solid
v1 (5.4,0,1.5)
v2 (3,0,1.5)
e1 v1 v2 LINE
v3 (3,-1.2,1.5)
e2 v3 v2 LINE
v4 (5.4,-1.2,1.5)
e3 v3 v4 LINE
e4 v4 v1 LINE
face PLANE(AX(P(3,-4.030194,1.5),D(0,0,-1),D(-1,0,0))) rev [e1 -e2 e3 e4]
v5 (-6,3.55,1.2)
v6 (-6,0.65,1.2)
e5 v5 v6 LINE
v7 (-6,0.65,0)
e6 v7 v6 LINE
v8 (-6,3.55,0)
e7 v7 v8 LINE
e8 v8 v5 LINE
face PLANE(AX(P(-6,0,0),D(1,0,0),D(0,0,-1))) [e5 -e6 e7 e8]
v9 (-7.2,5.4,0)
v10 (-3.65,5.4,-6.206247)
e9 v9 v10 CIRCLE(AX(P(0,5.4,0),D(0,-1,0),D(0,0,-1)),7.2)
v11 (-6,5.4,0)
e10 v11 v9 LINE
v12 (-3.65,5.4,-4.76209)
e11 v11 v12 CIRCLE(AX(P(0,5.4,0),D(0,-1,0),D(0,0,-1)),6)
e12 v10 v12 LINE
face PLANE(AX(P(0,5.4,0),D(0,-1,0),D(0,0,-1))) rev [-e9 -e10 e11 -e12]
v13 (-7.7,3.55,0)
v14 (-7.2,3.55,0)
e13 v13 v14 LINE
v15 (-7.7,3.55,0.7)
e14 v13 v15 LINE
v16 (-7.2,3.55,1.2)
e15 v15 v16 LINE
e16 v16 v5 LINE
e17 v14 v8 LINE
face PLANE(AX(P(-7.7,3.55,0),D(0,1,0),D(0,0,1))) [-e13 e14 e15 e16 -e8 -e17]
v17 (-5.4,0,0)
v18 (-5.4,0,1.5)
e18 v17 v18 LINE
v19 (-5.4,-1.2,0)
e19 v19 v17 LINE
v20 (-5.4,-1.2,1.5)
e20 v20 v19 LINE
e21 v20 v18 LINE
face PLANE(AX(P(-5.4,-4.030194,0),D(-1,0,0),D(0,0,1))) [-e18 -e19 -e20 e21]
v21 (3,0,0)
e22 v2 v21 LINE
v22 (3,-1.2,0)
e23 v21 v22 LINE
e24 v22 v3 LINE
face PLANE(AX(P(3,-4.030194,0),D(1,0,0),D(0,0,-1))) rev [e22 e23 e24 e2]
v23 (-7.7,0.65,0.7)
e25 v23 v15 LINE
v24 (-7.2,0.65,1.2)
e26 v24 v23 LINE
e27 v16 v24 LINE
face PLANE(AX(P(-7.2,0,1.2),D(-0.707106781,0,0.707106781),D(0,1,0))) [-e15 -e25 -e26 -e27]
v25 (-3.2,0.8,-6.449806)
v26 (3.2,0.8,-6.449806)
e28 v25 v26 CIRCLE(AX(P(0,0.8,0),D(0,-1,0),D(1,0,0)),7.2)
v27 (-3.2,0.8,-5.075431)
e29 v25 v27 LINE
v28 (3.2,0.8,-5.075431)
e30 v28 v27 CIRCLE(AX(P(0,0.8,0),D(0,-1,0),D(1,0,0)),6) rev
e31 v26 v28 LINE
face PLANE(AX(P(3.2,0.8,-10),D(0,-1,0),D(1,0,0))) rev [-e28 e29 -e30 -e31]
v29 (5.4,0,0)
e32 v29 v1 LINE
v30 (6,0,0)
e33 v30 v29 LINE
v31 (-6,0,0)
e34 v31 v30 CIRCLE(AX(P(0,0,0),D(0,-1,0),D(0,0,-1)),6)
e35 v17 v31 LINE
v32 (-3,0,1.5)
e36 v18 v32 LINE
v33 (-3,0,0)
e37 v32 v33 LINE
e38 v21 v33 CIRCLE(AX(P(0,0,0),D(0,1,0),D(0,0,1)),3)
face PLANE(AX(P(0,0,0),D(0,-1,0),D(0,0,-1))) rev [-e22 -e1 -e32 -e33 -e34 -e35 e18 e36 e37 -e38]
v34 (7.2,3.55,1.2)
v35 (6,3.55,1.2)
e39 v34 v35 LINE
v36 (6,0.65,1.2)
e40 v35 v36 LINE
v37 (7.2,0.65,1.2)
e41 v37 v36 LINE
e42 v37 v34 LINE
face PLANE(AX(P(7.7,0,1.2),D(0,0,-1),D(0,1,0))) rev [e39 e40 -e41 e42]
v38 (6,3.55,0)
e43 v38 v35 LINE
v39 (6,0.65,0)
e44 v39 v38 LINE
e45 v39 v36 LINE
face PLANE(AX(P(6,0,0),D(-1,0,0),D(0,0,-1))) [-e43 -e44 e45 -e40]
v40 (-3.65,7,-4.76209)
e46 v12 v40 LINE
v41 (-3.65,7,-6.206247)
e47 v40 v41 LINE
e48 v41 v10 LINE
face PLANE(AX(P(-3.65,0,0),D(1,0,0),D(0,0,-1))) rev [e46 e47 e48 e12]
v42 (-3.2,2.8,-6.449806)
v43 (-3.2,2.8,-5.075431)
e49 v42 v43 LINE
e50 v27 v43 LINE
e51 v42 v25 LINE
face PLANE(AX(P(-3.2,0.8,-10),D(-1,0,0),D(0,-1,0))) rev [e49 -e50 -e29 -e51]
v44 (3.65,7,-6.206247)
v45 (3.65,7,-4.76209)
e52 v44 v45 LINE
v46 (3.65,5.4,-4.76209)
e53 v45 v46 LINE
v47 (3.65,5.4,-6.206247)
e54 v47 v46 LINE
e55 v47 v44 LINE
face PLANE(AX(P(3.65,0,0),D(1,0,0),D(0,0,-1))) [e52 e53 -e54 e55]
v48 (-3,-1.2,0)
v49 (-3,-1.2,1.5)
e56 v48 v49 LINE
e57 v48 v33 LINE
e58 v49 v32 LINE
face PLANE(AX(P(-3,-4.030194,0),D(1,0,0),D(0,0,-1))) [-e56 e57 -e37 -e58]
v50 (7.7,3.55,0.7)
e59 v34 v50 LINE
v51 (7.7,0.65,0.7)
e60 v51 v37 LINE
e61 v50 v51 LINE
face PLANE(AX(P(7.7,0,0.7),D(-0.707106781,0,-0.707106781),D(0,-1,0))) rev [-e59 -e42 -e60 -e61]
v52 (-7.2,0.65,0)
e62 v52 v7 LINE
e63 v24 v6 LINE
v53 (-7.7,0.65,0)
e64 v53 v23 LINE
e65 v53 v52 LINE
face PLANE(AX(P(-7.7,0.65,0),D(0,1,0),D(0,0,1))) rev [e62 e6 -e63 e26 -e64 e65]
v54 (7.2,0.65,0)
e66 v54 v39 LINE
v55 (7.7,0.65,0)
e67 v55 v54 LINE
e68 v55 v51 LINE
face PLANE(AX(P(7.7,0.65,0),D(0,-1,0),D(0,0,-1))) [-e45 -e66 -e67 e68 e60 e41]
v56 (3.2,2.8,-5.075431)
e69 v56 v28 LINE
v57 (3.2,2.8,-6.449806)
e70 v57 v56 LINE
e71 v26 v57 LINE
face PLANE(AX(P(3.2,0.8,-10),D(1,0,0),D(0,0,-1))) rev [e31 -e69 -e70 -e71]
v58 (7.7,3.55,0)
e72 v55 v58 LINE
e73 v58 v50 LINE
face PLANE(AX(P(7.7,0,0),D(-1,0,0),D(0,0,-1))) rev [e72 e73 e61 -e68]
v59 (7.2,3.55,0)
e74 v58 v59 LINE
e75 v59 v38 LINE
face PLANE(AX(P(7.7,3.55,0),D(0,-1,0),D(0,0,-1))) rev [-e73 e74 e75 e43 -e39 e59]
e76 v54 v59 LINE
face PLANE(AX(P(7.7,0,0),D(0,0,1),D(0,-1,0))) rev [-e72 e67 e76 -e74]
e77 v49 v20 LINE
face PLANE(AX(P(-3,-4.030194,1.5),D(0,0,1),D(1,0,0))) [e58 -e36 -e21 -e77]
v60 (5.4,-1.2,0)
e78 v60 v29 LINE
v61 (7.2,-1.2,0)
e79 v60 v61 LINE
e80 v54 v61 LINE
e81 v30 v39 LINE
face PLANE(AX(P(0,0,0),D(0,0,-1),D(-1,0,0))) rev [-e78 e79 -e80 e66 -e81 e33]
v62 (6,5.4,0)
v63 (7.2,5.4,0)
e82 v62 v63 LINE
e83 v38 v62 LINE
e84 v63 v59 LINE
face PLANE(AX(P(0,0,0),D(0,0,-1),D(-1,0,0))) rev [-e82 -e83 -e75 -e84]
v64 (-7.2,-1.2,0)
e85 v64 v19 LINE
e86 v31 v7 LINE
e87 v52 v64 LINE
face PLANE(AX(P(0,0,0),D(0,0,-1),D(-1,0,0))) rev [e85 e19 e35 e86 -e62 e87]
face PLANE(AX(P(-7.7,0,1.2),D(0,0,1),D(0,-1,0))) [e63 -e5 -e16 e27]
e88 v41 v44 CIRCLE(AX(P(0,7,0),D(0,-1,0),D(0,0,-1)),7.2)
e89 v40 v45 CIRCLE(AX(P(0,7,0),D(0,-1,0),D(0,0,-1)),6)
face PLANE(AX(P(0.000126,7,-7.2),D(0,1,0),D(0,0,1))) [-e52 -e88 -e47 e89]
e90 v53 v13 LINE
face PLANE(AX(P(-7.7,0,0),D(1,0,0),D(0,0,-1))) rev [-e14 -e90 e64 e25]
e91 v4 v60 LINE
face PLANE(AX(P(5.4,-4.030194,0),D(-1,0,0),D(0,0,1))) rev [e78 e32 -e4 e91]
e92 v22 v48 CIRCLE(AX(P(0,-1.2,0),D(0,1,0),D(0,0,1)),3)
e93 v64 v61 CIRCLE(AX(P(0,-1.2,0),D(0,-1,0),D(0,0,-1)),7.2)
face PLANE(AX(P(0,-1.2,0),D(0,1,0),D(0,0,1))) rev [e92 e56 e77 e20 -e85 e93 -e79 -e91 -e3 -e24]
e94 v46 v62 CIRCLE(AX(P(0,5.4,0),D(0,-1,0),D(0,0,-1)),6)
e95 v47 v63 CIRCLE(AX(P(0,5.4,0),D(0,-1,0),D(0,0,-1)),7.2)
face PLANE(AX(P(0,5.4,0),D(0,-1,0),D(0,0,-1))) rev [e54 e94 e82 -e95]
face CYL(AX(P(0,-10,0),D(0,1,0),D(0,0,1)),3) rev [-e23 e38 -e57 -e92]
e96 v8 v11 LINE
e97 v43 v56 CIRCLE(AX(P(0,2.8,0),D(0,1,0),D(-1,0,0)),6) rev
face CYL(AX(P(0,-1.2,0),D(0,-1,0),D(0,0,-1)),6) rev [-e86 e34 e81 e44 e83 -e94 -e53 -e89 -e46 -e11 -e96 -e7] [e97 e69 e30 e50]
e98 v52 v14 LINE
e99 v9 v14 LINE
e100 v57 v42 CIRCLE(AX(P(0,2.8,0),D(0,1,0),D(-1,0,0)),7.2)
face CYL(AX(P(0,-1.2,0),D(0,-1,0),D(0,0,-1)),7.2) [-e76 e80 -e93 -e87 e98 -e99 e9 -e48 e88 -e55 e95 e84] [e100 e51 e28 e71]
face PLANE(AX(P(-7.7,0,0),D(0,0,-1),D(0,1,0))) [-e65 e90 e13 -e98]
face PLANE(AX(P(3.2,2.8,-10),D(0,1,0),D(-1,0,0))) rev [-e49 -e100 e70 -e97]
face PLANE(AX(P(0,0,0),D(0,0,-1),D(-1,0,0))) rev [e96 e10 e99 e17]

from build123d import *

# Parameters (mm, degrees)
SKETCH1_W                = 6
SKETCH1_H                = 1.2
SKETCH1_W_2              = 1.2
SKETCH1_H_2              = 5.4
REVOLVE1_ANGLE           = 180
REVOLVE2_START           = 5.4
REVOLVE2_DEPTH           = 1.6
SKETCH4_W                = 6.4
SKETCH4_H                = 2
CUT_EXTRUDE1_DEPTH       = 10
SKETCH5_R                = 3
CUT_EXTRUDE2_DEPTH       = 10
SKETCH6_W                = 2.4
SKETCH6_H                = 1.5
BOSS_EXTRUDE1_DEPTH      = 1.2
SKETCH7_W                = 1.2
SKETCH7_H                = 2.9
BOSS_EXTRUDE2_DEPTH      = 1.7
CHAMFER1_SIZE            = 0.5
CHAMFER1_OF_MIRROR1_SIZE = 0.5


# Read off the part's stored shape, not the designer's step: Revolve2
with BuildPart() as part:
    # Sketch1 → Revolve1 (revolve)
    with BuildSketch(Plane.XY):
        with Locations((3, -0.6)):
            Rectangle(SKETCH1_W, SKETCH1_H)
        with Locations((6.6, -0.6)):
            Rectangle(SKETCH1_W_2, SKETCH1_H)
        with Locations((6.6, 2.7)):
            Rectangle(SKETCH1_W_2, SKETCH1_H_2)
    revolve(axis=Axis((0, -1.2, 0), (0, 1, 0)), revolution_arc=REVOLVE1_ANGLE)

    # Revolve2 outline → Revolve2 (add)
    with BuildSketch(Plane(origin=(0, 0, 0), x_dir=(1, 0, 0), z_dir=(0, 1, 0)).offset(REVOLVE2_START)):
        with BuildLine():
            ThreePointArc((3.65, 6.206246853), (0, 7.2), (-3.65, 6.206246853))
            Line((-3.65, 6.206246853), (-3.65, 4.762089877))
            ThreePointArc((-3.65, 4.762089877), (0, 6), (3.65, 4.762089877))
            Line((3.65, 4.762089877), (3.65, 6.206246853))
        make_face()
    extrude(amount=REVOLVE2_DEPTH)

    # Sketch4 → Cut-Extrude1 (cut)
    with BuildSketch(Plane.XY):
        with Locations((0, 1.8)):
            Rectangle(SKETCH4_W, SKETCH4_H)
    extrude(amount=-CUT_EXTRUDE1_DEPTH, mode=Mode.SUBTRACT)

    # Sketch5 → Cut-Extrude2 (cut)
    with BuildSketch(Plane(origin=(0, 0, 0), x_dir=(1, 0, 0), z_dir=(0, 1, 0))):
        Circle(SKETCH5_R)
    extrude(amount=-CUT_EXTRUDE2_DEPTH, mode=Mode.SUBTRACT)

    # Sketch6 → Boss-Extrude1 (add)
    with BuildSketch(Plane(origin=(0, 0, 0), x_dir=(1, 0, 0), z_dir=(0, 1, 0))):
        with Locations((-4.2, -0.75)):
            Rectangle(SKETCH6_W, SKETCH6_H)
    boss_extrude1 = extrude(amount=-BOSS_EXTRUDE1_DEPTH)

    # Sketch7 → Boss-Extrude2 (add)
    with BuildSketch(Plane(origin=(-6, 0, 0), x_dir=(0, 0, -1), z_dir=(1, 0, 0))):
        with Locations((-0.6, 2.1)):
            Rectangle(SKETCH7_W, SKETCH7_H)
    boss_extrude2 = extrude(amount=-BOSS_EXTRUDE2_DEPTH)

    # Chamfer1
    chamfer1_edges = [part.edges().sort_by_distance(p)[0] for p in [
        (-7.7, 2.1, 1.2),
    ]]
    chamfer(chamfer1_edges, length=CHAMFER1_SIZE)

    # Mirror1: Boss-Extrude1, Boss-Extrude2 across plane
    add(boss_extrude1.mirror(Plane(origin=(0, 0, 0), x_dir=(0, 0, 1), z_dir=(1, 0, 0))))
    add(boss_extrude2.mirror(Plane(origin=(0, 0, 0), x_dir=(0, 0, 1), z_dir=(1, 0, 0))))

    # Chamfer1 of Mirror1
    chamfer1_of_mirror1_edges = [part.edges().sort_by_distance(p)[0] for p in [
        (7.7, 2.1, 1.2),
    ]]
    chamfer(chamfer1_of_mirror1_edges, length=CHAMFER1_OF_MIRROR1_SIZE)


solid = part.part
